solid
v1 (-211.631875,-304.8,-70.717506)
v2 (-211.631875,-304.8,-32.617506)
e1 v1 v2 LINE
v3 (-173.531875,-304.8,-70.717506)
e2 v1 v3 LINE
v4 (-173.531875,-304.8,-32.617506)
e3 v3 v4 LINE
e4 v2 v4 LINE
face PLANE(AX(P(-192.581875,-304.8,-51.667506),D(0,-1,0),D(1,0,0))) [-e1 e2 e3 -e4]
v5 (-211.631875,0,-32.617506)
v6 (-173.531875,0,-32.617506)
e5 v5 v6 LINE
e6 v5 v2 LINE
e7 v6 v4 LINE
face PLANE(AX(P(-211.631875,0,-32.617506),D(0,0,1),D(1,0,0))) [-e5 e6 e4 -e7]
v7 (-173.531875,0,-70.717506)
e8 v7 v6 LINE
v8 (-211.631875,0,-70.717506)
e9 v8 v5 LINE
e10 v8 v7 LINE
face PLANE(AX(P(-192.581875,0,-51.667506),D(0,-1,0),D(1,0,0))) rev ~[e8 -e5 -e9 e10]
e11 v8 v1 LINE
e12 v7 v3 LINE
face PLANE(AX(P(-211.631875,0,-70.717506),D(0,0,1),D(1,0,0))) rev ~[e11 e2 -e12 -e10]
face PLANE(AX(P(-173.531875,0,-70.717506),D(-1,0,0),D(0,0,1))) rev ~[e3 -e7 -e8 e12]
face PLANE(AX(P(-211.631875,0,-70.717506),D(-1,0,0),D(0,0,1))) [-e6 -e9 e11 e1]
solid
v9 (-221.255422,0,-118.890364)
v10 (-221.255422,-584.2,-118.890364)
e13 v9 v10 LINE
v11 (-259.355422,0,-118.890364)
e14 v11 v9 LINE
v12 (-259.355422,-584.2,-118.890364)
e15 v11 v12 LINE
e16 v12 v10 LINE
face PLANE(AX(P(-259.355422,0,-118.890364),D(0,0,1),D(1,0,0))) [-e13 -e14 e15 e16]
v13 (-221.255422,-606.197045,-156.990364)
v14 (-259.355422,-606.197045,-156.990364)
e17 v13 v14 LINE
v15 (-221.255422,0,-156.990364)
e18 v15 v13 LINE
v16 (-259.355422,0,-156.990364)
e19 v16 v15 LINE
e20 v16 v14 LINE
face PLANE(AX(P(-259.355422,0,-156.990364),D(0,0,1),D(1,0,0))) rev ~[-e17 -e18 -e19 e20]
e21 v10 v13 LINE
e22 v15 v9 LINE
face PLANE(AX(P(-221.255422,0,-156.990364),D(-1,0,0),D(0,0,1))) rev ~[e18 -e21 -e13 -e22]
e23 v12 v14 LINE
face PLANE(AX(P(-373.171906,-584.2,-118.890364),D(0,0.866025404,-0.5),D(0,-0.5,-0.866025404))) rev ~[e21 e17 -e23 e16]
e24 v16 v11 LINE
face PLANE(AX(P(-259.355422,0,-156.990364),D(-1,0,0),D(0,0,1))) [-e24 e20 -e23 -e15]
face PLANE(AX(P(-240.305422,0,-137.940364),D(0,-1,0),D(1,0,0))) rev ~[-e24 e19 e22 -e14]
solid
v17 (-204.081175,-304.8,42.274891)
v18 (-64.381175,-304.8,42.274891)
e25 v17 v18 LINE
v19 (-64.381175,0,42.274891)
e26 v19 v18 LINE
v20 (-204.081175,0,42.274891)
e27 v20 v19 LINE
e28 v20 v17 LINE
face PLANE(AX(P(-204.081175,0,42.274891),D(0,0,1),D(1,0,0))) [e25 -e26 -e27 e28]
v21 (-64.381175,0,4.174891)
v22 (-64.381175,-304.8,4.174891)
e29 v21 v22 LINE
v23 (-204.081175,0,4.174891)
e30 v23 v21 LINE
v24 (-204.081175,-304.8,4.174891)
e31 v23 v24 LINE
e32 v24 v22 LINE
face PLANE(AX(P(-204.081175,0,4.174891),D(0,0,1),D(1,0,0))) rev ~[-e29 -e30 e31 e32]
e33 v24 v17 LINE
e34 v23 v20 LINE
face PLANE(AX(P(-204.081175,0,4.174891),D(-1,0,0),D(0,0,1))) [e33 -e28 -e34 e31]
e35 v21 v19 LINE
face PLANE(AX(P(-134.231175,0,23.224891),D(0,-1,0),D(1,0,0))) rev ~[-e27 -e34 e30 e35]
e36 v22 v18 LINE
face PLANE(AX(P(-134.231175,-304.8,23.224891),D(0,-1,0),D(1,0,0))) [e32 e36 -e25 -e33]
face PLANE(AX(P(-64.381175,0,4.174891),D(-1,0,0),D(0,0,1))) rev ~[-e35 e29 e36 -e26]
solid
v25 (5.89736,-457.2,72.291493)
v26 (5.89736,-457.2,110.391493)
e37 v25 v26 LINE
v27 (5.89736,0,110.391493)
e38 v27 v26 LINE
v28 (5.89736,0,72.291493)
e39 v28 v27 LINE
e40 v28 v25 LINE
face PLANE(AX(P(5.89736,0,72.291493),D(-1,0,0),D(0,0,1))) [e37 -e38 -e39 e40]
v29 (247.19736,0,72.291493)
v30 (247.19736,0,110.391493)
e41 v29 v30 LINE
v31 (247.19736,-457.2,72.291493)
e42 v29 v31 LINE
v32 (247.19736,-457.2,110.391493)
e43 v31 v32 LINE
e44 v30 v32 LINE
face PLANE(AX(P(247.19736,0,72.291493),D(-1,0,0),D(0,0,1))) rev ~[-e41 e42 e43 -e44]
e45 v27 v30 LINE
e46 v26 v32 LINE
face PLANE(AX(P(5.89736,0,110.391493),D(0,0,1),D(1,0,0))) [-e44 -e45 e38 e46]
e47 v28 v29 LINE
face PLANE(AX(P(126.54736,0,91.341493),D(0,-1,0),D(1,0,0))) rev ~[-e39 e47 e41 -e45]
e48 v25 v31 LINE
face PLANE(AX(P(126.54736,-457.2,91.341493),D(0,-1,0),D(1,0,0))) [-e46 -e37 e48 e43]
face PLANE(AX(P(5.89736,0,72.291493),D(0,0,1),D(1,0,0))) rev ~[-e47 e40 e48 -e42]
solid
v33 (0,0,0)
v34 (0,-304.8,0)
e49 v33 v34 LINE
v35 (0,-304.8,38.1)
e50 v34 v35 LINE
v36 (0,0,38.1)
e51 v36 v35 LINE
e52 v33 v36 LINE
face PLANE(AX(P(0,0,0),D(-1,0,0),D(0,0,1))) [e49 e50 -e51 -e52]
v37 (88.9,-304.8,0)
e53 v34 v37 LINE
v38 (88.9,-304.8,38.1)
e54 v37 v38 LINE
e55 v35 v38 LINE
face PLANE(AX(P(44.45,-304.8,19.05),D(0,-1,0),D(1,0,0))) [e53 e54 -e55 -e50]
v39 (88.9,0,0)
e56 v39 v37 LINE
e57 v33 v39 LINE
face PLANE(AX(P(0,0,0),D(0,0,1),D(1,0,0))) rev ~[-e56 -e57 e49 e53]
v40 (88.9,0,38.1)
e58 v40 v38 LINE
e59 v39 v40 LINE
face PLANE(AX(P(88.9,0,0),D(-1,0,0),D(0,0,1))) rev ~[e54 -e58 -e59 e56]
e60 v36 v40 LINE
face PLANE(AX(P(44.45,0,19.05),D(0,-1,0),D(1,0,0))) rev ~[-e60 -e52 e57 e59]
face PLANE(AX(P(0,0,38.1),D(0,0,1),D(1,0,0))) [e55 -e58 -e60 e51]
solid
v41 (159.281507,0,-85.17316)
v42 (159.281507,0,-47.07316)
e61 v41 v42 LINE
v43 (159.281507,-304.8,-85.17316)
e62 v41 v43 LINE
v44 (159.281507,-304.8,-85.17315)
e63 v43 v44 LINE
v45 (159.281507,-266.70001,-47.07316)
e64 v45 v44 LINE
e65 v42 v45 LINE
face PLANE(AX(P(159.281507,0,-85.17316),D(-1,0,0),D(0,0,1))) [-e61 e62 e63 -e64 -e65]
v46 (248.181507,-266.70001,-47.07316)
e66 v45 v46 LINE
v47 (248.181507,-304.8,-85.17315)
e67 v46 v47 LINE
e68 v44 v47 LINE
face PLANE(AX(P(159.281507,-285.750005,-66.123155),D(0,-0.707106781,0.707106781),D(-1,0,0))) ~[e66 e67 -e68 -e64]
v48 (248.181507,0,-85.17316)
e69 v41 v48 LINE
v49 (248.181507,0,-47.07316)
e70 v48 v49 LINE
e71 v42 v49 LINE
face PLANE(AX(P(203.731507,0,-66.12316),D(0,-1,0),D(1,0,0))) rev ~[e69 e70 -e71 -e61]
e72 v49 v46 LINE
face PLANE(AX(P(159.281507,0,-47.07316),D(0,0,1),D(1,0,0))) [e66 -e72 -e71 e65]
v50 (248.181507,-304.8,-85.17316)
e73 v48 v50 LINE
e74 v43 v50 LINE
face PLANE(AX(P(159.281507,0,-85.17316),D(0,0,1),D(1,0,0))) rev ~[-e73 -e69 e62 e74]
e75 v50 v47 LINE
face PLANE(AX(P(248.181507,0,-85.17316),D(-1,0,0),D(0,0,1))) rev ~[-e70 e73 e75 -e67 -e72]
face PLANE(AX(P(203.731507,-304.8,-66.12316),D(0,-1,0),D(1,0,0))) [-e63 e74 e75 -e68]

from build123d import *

# Parameters (mm, degrees)
F0_W         = 88.9
F0_H         = 38.1
F1_DEPTH     = 304.8
F3_W         = 139.7
F3_H         = 38.1
F4_DEPTH     = 304.8
F6_W         = 241.3
F6_H         = 38.1
F7_DEPTH     = 457.2
F8_W         = 38.1
F8_H         = 38.1
F9_DEPTH     = 304.8
F10_W        = 88.9
F10_H        = 38.1
F11_DEPTH    = 304.8
F12_SIZE     = 38.09999
F13_W        = 38.1
F13_H        = 38.1
F14_DEPTH    = 609.6
F15_T1_DEPTH = 265.7329697057


# Not quite as in the source:
# - a fillet or chamfer that OpenCascade refuses, or shapes differently, is made with other operations: its cross-section is extruded or revolved along the edge and cut away or added
# - a fillet or chamfer is up to 0.001 mm smaller than in the source, because OpenCascade refuses the exact size


with BuildPart() as f1:
    # F0 (on Front) → F1 (new body)
    with BuildSketch(Plane.XZ):
        with Locations((44.45, 19.05)):
            Rectangle(F0_W, F0_H)
    extrude(amount=F1_DEPTH)


with BuildPart() as f2_1:
    # F2: copy of F1
    add(f1.part.moved(Location((127, 0, 0))))


with BuildPart() as f4:
    # F3 (on Front) → F4 (new body)
    with BuildSketch(Plane.XZ):
        with Locations((-134.2311747432, 23.224890928)):
            Rectangle(F3_W, F3_H)
    extrude(amount=F4_DEPTH)


with BuildPart() as f7:
    # F6 (on Front) → F7 (new body)
    with BuildSketch(Plane.XZ):
        with Locations((126.5473598003, 91.3414934158)):
            Rectangle(F6_W, F6_H)
    extrude(amount=F7_DEPTH)


with BuildPart() as f9:
    # F8 (on Front) → F9 (new body)
    with BuildSketch(Plane.XZ):
        with Locations((-192.5818750143, -51.6675061107)):
            Rectangle(F8_W, F8_H)
    extrude(amount=F9_DEPTH)


with BuildPart() as f11:
    # F10 (on Front) → F11 (new body)
    with BuildSketch(Plane.XZ):
        with Locations((203.7315069914, -66.1231598377)):
            Rectangle(F10_W, F10_H)
    extrude(amount=F11_DEPTH)

    # F12 (size 38.1 in the source; OpenCascade refuses exactly that, so slightly less here)
    f12_edges = [f11.edges().sort_by_distance(p)[0] for p in [
        (203.731507, -304.8, -47.07316),
    ]]
    chamfer(f12_edges, length=F12_SIZE)


with BuildPart() as f14:
    # F13 (on Front) → F14 (new body)
    with BuildSketch(Plane.XZ):
        with Locations((-240.3054216385, -137.9403641939)):
            Rectangle(F13_W, F13_H)
    extrude(amount=F14_DEPTH)

    # F15: chamfer of 25.4 x 43.9940905122 on 1 edges, made by hand

    # F15_s2 → F15_t1 (cut)
    with BuildSketch(Plane.YZ.offset(-373.1719064913)):
        Polygon((-584.2, -118.8903641939), (-609.6, -162.8844547062), (-609.6, -118.8903641939), align=None)
    extrude(amount=F15_T1_DEPTH, mode=Mode.SUBTRACT)


solid = Compound([f1.part, f4.part, f7.part, f9.part, f11.part, f14.part])
